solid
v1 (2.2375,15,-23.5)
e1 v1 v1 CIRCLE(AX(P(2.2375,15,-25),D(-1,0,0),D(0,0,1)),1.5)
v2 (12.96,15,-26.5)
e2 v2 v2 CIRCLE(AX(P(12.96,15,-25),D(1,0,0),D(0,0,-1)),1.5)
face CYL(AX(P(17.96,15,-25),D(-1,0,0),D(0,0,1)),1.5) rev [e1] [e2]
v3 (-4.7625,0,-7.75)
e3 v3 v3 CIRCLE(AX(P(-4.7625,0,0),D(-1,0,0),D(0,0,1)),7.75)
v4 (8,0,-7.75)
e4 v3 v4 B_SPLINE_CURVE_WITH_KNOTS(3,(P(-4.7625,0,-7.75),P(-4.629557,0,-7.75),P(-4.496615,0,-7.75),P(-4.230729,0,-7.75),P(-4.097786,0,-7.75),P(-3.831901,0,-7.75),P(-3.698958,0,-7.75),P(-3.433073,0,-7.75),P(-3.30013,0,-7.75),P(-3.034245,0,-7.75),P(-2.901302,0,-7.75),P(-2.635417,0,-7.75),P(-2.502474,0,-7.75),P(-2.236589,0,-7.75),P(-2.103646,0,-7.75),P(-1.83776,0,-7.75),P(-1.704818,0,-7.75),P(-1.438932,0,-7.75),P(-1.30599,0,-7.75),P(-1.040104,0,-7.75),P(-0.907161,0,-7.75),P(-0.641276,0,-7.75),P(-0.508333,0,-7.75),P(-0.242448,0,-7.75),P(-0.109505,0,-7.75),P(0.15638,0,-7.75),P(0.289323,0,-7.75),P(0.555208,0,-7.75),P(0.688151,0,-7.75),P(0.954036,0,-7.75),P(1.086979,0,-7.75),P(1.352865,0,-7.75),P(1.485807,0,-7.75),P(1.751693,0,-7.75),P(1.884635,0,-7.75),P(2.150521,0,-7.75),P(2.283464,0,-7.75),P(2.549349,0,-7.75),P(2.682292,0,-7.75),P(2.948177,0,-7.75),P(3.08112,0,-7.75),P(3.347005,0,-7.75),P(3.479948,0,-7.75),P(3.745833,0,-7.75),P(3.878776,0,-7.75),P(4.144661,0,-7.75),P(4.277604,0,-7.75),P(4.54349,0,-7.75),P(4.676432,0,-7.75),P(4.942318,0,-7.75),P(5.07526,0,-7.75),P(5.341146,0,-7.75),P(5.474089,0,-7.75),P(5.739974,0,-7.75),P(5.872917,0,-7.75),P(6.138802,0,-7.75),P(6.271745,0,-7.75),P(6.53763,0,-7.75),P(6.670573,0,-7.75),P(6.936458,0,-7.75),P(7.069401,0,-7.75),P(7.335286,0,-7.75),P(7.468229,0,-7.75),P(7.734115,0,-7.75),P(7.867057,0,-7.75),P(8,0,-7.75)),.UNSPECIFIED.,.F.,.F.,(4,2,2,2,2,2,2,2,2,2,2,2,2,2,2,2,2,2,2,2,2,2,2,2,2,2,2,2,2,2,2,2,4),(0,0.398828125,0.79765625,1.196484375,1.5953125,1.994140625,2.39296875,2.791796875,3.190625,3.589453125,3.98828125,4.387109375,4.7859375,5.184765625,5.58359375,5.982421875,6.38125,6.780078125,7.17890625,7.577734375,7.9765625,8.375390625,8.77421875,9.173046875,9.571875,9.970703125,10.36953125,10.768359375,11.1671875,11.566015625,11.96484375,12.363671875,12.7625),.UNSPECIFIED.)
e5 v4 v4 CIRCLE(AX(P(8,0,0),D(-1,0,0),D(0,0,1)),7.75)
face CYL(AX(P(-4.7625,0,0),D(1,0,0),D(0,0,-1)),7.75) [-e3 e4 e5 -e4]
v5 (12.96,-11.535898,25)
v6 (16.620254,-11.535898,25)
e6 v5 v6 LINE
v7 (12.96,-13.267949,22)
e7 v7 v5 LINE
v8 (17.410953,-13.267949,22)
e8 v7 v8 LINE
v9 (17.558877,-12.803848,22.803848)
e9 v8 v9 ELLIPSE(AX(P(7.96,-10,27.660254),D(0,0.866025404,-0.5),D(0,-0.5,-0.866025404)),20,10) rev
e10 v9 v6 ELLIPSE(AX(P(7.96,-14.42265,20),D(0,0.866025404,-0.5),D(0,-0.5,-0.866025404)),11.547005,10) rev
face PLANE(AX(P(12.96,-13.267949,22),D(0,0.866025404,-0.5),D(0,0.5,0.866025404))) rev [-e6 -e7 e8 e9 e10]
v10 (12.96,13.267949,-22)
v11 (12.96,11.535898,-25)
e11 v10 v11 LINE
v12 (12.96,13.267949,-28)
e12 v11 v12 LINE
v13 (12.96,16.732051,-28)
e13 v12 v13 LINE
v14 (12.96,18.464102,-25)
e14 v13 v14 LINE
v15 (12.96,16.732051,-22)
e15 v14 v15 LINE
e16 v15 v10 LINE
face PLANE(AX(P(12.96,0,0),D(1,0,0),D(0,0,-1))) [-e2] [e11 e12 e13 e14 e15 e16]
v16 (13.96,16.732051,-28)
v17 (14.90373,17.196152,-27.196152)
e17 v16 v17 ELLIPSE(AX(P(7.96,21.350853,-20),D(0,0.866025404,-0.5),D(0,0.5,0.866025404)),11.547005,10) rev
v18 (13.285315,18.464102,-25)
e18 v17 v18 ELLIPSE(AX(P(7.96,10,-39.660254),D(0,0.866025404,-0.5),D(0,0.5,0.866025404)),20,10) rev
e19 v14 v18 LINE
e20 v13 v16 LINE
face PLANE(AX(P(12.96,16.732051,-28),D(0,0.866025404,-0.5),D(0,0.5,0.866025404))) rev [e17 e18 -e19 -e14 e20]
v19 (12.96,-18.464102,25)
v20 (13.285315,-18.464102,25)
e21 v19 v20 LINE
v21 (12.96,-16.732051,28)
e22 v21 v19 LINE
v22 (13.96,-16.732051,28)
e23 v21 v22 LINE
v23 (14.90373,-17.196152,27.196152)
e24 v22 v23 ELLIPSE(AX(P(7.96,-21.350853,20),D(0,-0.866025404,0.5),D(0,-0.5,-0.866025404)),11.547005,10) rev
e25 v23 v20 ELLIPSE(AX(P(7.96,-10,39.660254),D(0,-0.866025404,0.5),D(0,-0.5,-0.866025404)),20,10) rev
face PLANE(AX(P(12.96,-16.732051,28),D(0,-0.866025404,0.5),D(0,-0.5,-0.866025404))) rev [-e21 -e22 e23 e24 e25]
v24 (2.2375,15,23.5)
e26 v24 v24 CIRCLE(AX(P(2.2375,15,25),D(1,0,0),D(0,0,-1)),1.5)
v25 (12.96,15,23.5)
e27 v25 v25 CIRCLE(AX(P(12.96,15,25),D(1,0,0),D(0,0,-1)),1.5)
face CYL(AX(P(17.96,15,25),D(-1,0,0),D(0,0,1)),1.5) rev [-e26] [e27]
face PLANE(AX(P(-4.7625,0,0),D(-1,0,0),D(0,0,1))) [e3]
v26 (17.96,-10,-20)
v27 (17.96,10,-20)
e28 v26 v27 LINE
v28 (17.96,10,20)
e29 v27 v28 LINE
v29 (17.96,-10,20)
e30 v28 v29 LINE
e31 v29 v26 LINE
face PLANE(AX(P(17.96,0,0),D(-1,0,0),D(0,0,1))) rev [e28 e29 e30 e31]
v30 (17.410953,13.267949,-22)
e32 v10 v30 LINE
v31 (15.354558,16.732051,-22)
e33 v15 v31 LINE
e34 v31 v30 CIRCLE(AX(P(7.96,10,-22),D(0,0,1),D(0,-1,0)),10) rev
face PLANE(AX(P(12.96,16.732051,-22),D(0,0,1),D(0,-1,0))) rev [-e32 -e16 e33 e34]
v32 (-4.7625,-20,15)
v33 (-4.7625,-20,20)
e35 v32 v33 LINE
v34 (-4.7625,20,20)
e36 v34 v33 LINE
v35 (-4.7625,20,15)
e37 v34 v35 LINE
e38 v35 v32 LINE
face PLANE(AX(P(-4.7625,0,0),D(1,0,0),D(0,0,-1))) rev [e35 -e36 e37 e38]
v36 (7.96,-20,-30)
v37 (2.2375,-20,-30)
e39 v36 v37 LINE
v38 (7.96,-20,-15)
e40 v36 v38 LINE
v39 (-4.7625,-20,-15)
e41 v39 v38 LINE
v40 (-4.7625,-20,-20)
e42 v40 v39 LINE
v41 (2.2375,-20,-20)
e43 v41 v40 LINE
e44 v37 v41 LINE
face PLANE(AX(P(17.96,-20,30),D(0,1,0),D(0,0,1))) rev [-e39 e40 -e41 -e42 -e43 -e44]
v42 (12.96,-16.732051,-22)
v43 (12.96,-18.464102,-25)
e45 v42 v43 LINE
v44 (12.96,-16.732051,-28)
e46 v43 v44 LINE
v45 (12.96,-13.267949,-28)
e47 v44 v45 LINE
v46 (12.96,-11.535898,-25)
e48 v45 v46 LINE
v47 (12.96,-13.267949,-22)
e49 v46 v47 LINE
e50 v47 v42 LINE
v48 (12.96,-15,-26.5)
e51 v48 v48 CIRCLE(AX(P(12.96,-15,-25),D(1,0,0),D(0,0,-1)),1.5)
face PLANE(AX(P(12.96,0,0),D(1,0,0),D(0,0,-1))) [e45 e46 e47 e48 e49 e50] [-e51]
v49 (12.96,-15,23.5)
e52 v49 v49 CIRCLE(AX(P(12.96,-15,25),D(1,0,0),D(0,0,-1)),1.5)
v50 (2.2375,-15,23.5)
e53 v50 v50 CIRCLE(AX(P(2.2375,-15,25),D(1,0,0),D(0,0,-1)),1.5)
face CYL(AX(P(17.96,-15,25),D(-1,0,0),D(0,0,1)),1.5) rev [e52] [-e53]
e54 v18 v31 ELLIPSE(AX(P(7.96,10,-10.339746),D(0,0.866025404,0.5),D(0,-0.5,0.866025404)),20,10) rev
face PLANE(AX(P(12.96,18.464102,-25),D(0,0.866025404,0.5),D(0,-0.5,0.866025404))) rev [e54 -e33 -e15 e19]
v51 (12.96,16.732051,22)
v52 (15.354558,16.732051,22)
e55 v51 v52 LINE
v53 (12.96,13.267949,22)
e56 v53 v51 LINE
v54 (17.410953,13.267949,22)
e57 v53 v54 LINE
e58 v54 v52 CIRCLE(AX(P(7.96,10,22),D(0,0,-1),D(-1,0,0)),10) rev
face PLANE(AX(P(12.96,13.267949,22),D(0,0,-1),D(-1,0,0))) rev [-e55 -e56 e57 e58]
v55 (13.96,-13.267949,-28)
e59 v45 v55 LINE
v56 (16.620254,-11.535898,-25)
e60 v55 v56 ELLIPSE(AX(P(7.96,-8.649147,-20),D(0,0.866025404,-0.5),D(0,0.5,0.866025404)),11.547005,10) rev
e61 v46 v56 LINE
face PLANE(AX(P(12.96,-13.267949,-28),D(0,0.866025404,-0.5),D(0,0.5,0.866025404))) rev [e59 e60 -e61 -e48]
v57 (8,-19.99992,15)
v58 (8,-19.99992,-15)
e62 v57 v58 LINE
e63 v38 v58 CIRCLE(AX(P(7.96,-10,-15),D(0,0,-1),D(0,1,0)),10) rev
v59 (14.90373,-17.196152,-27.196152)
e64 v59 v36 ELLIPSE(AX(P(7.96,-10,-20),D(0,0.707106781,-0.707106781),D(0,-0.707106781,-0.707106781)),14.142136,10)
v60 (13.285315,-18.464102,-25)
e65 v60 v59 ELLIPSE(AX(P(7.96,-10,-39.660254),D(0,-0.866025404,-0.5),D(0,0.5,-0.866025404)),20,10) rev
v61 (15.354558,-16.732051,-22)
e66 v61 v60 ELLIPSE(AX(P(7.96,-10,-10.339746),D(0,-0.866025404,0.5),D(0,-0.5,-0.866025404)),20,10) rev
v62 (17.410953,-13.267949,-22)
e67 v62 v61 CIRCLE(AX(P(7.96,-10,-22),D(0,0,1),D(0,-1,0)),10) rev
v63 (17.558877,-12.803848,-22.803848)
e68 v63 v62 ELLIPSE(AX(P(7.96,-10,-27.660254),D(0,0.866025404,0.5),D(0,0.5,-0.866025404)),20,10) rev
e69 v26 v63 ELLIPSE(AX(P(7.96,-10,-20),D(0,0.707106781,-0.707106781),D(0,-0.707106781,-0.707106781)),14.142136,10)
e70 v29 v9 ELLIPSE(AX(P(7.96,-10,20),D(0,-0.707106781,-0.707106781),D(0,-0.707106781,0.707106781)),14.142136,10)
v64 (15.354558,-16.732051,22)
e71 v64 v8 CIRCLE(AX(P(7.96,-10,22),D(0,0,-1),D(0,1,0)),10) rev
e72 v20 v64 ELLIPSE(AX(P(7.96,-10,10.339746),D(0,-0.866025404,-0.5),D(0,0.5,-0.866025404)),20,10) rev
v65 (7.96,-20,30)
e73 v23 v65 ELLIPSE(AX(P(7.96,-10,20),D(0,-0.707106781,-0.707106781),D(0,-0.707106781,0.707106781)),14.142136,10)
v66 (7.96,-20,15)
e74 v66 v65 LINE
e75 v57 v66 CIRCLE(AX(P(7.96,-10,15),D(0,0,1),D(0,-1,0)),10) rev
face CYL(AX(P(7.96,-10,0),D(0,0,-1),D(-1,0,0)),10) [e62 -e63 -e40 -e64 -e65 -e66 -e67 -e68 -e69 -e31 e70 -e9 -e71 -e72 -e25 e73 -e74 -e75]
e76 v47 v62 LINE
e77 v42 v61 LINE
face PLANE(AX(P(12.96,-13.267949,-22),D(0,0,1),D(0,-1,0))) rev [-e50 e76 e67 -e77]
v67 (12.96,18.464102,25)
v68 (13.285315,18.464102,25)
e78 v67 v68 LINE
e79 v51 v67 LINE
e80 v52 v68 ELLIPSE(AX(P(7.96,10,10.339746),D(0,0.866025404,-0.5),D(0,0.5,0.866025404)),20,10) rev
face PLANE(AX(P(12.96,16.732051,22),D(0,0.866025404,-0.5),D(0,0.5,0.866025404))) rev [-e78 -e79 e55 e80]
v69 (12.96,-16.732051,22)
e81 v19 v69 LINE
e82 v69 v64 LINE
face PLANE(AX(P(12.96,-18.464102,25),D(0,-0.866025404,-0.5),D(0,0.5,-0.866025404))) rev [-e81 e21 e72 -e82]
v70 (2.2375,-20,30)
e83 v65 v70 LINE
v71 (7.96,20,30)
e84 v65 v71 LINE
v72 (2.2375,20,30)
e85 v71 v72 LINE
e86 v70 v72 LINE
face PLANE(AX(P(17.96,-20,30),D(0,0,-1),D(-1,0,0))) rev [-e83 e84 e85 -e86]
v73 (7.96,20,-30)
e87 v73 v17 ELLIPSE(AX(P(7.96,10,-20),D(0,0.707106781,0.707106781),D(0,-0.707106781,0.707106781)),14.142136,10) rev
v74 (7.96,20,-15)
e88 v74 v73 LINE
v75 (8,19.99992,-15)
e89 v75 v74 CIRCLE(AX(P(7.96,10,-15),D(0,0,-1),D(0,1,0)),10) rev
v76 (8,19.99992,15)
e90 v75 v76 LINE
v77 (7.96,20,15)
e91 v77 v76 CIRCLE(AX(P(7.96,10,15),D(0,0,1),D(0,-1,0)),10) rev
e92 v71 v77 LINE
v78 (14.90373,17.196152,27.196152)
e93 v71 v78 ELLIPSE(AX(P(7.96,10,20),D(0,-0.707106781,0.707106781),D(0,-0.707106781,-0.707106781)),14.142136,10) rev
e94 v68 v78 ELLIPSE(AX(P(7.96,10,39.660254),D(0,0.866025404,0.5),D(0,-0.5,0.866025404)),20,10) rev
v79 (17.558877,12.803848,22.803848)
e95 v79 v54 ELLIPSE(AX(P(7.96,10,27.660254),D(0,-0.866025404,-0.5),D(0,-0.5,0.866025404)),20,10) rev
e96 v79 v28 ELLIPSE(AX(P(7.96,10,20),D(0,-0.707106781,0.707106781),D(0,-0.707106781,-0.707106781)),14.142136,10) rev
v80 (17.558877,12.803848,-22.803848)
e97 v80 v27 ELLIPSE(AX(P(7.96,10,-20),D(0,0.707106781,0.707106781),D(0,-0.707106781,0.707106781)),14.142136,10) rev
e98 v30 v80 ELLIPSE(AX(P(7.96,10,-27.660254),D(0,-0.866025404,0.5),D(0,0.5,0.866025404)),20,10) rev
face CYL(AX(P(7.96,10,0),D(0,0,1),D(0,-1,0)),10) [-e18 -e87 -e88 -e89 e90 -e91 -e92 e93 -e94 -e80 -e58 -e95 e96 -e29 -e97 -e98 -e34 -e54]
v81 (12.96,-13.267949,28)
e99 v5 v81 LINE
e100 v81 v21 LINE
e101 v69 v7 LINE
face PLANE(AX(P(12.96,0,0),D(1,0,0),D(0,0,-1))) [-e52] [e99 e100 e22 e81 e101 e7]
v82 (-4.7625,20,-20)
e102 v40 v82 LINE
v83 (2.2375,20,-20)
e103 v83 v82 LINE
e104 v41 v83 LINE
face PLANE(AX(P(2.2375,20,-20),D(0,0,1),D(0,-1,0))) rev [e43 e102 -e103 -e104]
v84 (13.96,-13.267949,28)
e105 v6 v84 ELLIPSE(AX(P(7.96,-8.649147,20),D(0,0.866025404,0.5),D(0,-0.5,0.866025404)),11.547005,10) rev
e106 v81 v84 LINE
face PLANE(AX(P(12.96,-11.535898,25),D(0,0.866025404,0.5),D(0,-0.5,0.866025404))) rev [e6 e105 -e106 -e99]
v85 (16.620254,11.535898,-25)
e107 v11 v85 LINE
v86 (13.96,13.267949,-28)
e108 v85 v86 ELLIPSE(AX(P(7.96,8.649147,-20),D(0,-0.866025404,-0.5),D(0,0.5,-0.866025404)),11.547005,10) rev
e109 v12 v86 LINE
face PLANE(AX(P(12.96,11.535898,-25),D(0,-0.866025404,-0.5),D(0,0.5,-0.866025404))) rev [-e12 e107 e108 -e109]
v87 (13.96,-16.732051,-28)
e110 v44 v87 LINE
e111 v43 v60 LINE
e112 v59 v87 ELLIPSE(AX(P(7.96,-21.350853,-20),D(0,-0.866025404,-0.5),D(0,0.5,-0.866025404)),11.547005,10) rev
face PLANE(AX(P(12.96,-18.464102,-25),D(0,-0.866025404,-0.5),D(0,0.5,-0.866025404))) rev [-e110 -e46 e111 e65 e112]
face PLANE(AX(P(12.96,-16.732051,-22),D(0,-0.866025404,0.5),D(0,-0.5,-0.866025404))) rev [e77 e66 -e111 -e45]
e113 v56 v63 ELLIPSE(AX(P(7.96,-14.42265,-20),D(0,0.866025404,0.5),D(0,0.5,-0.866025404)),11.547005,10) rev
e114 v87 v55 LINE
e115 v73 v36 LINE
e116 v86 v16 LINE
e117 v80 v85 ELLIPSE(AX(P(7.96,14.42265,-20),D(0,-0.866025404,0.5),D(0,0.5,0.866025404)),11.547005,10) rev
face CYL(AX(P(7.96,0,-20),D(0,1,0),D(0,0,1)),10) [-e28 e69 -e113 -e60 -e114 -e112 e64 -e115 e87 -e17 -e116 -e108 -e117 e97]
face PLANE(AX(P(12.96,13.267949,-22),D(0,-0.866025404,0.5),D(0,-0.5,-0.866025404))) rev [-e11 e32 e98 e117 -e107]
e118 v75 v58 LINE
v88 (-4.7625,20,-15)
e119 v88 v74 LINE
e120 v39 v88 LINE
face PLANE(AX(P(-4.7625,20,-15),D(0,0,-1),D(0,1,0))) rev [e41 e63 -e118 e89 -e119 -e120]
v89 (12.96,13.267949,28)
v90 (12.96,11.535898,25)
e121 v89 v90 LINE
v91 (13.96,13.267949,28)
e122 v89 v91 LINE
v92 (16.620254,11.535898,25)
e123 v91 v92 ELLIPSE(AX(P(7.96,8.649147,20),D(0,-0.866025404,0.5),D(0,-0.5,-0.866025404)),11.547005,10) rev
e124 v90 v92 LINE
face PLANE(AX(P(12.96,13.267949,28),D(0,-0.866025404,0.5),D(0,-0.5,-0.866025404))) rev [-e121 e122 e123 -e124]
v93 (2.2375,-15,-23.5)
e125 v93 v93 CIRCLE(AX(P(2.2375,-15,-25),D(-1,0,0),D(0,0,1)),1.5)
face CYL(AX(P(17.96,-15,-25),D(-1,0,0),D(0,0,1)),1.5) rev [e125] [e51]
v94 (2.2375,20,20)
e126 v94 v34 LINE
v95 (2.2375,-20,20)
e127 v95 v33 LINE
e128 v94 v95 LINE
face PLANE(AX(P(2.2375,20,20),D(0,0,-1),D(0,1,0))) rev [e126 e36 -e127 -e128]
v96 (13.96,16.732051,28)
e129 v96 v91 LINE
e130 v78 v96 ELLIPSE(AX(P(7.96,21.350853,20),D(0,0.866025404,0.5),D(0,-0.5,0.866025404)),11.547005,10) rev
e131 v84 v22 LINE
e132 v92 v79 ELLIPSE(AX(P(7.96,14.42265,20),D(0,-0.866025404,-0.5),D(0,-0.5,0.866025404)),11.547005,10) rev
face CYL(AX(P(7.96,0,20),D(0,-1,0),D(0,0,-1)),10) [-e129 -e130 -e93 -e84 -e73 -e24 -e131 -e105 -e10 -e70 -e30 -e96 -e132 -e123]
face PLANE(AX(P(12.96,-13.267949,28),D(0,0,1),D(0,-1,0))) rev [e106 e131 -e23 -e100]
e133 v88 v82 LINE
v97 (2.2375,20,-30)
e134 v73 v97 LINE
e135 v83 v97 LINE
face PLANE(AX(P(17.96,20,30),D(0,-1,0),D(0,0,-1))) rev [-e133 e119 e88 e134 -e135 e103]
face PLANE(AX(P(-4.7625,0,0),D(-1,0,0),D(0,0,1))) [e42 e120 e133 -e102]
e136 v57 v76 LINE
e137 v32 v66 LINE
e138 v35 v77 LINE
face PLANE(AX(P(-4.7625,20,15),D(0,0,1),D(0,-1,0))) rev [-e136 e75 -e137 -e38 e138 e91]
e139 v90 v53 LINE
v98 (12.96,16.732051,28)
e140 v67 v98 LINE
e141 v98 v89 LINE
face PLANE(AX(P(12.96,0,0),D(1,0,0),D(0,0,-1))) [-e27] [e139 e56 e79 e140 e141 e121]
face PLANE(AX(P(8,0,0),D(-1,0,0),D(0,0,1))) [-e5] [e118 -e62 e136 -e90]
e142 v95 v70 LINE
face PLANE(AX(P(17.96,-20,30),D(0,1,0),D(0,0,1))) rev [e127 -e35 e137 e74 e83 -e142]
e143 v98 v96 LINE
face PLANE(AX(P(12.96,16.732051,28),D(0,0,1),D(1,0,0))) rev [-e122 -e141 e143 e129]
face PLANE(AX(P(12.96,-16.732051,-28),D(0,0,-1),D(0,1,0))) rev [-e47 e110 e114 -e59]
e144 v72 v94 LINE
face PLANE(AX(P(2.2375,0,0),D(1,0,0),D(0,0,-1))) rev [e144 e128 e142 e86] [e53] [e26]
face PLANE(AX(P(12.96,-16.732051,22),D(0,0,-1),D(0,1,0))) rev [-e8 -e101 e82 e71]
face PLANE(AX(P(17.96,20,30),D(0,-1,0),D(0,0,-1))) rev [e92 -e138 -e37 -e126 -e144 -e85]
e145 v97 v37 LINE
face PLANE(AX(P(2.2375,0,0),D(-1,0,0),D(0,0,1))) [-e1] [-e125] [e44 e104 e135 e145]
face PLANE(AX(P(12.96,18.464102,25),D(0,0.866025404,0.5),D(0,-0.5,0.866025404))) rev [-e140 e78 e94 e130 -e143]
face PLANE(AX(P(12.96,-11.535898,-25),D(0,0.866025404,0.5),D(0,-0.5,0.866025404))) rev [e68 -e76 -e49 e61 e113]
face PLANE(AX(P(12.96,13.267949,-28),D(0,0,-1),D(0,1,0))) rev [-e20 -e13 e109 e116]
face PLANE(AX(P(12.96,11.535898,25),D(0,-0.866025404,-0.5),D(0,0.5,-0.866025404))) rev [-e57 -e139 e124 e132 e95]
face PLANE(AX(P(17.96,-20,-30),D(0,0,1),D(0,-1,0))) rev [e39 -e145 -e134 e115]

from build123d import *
from build123d.topology import SkipClean

# Parameters (mm, degrees)
CROQUIS1_W              = 60
CROQUIS1_H              = 40
CROQUIS1_R              = 1.5
SALIENTE_EXTRUIR1_DEPTH = 17.96
SALIENTE_EXTRUIR2_START = 4.7625
CROQUIS3_W              = 15
CROQUIS3_H              = 40
CROQUIS3_R              = 1.5
SALIENTE_EXTRUIR2_DEPTH = 4.7625
CROQUIS4_R              = 7.75
SALIENTE_EXTRUIR3_DEPTH = 4.7625
REDONDEO2_R             = 10
CORTAR_EXTRUIR1_DEPTH   = 5
CROQUIS6_W              = 10
CROQUIS6_H              = 40
CORTAR_EXTRUIR2_DEPTH   = 7
CORTAR_EXTRUIR3_START   = -8
CROQUIS7_W              = 30
CROQUIS7_H              = 40
CROQUIS7_R              = 7.75
CORTAR_EXTRUIR3_DEPTH   = 8


with BuildPart() as part:
    # Croquis1 → Saliente-Extruir1 (new body)
    with BuildSketch(Plane(origin=(0, 0, 0), x_dir=(0, 0, -1), z_dir=(1, 0, 0))):
        Rectangle(CROQUIS1_W, CROQUIS1_H)
        with Locations((-25, 15)):
            Circle(CROQUIS1_R, mode=Mode.SUBTRACT)
        with Locations(Location((25, 15, 0), (0, 0, 180))):
            Circle(CROQUIS1_R, mode=Mode.SUBTRACT)
        with Locations((25, -15)):
            Circle(CROQUIS1_R, mode=Mode.SUBTRACT)
        with Locations(Location((-25, -15, 0), (0, 0, 180))):
            Circle(CROQUIS1_R, mode=Mode.SUBTRACT)
    extrude(amount=SALIENTE_EXTRUIR1_DEPTH)

    # Croquis3 → Saliente-Extruir2 (add)
    # profile 1 of 2: a face of its own
    with SkipClean():  # the faces are left unmerged after this step: merging them gives an invalid solid
        with BuildSketch(Plane.ZY.offset(SALIENTE_EXTRUIR2_START)):
            with Locations((-22.5, 0)):
                Rectangle(CROQUIS3_W, CROQUIS3_H)
            with Locations((-25, -15)):
                Circle(CROQUIS3_R, mode=Mode.SUBTRACT)
            with Locations((-25, 15)):
                Circle(CROQUIS3_R, mode=Mode.SUBTRACT)
        # profile 2 of 2: a face of its own
        with BuildSketch(Plane.ZY.offset(SALIENTE_EXTRUIR2_START)):
            with Locations((22.5, 0)):
                Rectangle(CROQUIS3_W, CROQUIS3_H)
            with Locations((25, -15)):
                Circle(CROQUIS3_R, mode=Mode.SUBTRACT)
            with Locations((25, 15)):
                Circle(CROQUIS3_R, mode=Mode.SUBTRACT)
        extrude(amount=-SALIENTE_EXTRUIR2_DEPTH)

    # Croquis4 → Saliente-Extruir3 (add)
    with SkipClean():  # the faces are left unmerged after this step: merging them gives an invalid solid
        with BuildSketch(Plane.ZY):
            with Locations(Location((0, 0, 0), (0, 0, 180))):
                Circle(CROQUIS4_R)
        extrude(amount=SALIENTE_EXTRUIR3_DEPTH)

    # Redondeo2
    # the kernel refuses this fillet: 10 mm, written as the material it takes off along each edge
    with BuildSketch(Plane(origin=(17.96, -45, -30), x_dir=(-1, 0, 0), z_dir=(0, 1, 0)), Plane(origin=(17.96, 45, 30), x_dir=(-1, 0, 0), z_dir=(0, -1, 0))) as redondeo2_piece_1:
        with BuildLine():
            CenterArc((REDONDEO2_R, REDONDEO2_R), REDONDEO2_R, 180, 90)
            Line((0, REDONDEO2_R), (0, 0))
            Line((0, 0), (REDONDEO2_R, 0))
        make_face()
    extrude(amount=90, mode=Mode.SUBTRACT)
    with BuildSketch(Plane(origin=(17.96, 20, -55), x_dir=(0, -1, 0), z_dir=(0, 0, 1))) as redondeo2_piece_2:
        with BuildLine():
            CenterArc((REDONDEO2_R, -REDONDEO2_R), REDONDEO2_R, 90, 90)
            Line((0, -REDONDEO2_R), (0, 0))
            Line((0, 0), (REDONDEO2_R, 0))
        make_face()
    extrude(amount=110, mode=Mode.SUBTRACT)
    with BuildSketch(Plane(origin=(17.96, -20, 55), x_dir=(-1, 0, 0), z_dir=(0, 0, -1))) as redondeo2_piece_3:
        with BuildLine():
            CenterArc((REDONDEO2_R, REDONDEO2_R), REDONDEO2_R, 180, 90)
            Line((0, REDONDEO2_R), (0, 0))
            Line((0, 0), (REDONDEO2_R, 0))
        make_face()
    extrude(amount=110, mode=Mode.SUBTRACT)

    # Croquis5 → Cortar-Extruir1 (cut)
    with BuildSketch(Plane(origin=(17.96, 0, 0), x_dir=(0, 0, -1), z_dir=(1, 0, 0))):
        Polygon((-25, 18.464101615), (-28, 16.732050808), (-28, 13.267949192), (-25, 11.535898385), (-22, 13.267949192), (-22, 16.732050808), align=None)
        Polygon((25, 18.464101615), (22, 16.732050808), (22, 13.267949192), (25, 11.535898385), (28, 13.267949192), (28, 16.732050808), align=None)
        Polygon((25, -18.464101615), (28, -16.732050808), (28, -13.267949192), (25, -11.535898385), (22, -13.267949192), (22, -16.732050808), align=None)
        Polygon((-25, -18.464101615), (-22, -16.732050808), (-22, -13.267949192), (-25, -11.535898385), (-28, -13.267949192), (-28, -16.732050808), align=None)
    extrude(amount=-CORTAR_EXTRUIR1_DEPTH, mode=Mode.SUBTRACT)

    # Croquis6 → Cortar-Extruir2 (cut)
    with BuildSketch(Plane.ZY.offset(4.7625)):
        with Locations((25, 0)):
            Rectangle(CROQUIS6_W, CROQUIS6_H)
        with Locations((-25, 0)):
            Rectangle(CROQUIS6_W, CROQUIS6_H)
    extrude(amount=-CORTAR_EXTRUIR2_DEPTH, mode=Mode.SUBTRACT)

    # Croquis7 → Cortar-Extruir3 (cut)
    with BuildSketch(Plane.ZY.offset(CORTAR_EXTRUIR3_START)):
        Rectangle(CROQUIS7_W, CROQUIS7_H)
        with Locations(Location((0, 0, 0), (0, 0, 180))):
            Circle(CROQUIS7_R, mode=Mode.SUBTRACT)
    extrude(amount=CORTAR_EXTRUIR3_DEPTH, mode=Mode.SUBTRACT)


solid = part.part
